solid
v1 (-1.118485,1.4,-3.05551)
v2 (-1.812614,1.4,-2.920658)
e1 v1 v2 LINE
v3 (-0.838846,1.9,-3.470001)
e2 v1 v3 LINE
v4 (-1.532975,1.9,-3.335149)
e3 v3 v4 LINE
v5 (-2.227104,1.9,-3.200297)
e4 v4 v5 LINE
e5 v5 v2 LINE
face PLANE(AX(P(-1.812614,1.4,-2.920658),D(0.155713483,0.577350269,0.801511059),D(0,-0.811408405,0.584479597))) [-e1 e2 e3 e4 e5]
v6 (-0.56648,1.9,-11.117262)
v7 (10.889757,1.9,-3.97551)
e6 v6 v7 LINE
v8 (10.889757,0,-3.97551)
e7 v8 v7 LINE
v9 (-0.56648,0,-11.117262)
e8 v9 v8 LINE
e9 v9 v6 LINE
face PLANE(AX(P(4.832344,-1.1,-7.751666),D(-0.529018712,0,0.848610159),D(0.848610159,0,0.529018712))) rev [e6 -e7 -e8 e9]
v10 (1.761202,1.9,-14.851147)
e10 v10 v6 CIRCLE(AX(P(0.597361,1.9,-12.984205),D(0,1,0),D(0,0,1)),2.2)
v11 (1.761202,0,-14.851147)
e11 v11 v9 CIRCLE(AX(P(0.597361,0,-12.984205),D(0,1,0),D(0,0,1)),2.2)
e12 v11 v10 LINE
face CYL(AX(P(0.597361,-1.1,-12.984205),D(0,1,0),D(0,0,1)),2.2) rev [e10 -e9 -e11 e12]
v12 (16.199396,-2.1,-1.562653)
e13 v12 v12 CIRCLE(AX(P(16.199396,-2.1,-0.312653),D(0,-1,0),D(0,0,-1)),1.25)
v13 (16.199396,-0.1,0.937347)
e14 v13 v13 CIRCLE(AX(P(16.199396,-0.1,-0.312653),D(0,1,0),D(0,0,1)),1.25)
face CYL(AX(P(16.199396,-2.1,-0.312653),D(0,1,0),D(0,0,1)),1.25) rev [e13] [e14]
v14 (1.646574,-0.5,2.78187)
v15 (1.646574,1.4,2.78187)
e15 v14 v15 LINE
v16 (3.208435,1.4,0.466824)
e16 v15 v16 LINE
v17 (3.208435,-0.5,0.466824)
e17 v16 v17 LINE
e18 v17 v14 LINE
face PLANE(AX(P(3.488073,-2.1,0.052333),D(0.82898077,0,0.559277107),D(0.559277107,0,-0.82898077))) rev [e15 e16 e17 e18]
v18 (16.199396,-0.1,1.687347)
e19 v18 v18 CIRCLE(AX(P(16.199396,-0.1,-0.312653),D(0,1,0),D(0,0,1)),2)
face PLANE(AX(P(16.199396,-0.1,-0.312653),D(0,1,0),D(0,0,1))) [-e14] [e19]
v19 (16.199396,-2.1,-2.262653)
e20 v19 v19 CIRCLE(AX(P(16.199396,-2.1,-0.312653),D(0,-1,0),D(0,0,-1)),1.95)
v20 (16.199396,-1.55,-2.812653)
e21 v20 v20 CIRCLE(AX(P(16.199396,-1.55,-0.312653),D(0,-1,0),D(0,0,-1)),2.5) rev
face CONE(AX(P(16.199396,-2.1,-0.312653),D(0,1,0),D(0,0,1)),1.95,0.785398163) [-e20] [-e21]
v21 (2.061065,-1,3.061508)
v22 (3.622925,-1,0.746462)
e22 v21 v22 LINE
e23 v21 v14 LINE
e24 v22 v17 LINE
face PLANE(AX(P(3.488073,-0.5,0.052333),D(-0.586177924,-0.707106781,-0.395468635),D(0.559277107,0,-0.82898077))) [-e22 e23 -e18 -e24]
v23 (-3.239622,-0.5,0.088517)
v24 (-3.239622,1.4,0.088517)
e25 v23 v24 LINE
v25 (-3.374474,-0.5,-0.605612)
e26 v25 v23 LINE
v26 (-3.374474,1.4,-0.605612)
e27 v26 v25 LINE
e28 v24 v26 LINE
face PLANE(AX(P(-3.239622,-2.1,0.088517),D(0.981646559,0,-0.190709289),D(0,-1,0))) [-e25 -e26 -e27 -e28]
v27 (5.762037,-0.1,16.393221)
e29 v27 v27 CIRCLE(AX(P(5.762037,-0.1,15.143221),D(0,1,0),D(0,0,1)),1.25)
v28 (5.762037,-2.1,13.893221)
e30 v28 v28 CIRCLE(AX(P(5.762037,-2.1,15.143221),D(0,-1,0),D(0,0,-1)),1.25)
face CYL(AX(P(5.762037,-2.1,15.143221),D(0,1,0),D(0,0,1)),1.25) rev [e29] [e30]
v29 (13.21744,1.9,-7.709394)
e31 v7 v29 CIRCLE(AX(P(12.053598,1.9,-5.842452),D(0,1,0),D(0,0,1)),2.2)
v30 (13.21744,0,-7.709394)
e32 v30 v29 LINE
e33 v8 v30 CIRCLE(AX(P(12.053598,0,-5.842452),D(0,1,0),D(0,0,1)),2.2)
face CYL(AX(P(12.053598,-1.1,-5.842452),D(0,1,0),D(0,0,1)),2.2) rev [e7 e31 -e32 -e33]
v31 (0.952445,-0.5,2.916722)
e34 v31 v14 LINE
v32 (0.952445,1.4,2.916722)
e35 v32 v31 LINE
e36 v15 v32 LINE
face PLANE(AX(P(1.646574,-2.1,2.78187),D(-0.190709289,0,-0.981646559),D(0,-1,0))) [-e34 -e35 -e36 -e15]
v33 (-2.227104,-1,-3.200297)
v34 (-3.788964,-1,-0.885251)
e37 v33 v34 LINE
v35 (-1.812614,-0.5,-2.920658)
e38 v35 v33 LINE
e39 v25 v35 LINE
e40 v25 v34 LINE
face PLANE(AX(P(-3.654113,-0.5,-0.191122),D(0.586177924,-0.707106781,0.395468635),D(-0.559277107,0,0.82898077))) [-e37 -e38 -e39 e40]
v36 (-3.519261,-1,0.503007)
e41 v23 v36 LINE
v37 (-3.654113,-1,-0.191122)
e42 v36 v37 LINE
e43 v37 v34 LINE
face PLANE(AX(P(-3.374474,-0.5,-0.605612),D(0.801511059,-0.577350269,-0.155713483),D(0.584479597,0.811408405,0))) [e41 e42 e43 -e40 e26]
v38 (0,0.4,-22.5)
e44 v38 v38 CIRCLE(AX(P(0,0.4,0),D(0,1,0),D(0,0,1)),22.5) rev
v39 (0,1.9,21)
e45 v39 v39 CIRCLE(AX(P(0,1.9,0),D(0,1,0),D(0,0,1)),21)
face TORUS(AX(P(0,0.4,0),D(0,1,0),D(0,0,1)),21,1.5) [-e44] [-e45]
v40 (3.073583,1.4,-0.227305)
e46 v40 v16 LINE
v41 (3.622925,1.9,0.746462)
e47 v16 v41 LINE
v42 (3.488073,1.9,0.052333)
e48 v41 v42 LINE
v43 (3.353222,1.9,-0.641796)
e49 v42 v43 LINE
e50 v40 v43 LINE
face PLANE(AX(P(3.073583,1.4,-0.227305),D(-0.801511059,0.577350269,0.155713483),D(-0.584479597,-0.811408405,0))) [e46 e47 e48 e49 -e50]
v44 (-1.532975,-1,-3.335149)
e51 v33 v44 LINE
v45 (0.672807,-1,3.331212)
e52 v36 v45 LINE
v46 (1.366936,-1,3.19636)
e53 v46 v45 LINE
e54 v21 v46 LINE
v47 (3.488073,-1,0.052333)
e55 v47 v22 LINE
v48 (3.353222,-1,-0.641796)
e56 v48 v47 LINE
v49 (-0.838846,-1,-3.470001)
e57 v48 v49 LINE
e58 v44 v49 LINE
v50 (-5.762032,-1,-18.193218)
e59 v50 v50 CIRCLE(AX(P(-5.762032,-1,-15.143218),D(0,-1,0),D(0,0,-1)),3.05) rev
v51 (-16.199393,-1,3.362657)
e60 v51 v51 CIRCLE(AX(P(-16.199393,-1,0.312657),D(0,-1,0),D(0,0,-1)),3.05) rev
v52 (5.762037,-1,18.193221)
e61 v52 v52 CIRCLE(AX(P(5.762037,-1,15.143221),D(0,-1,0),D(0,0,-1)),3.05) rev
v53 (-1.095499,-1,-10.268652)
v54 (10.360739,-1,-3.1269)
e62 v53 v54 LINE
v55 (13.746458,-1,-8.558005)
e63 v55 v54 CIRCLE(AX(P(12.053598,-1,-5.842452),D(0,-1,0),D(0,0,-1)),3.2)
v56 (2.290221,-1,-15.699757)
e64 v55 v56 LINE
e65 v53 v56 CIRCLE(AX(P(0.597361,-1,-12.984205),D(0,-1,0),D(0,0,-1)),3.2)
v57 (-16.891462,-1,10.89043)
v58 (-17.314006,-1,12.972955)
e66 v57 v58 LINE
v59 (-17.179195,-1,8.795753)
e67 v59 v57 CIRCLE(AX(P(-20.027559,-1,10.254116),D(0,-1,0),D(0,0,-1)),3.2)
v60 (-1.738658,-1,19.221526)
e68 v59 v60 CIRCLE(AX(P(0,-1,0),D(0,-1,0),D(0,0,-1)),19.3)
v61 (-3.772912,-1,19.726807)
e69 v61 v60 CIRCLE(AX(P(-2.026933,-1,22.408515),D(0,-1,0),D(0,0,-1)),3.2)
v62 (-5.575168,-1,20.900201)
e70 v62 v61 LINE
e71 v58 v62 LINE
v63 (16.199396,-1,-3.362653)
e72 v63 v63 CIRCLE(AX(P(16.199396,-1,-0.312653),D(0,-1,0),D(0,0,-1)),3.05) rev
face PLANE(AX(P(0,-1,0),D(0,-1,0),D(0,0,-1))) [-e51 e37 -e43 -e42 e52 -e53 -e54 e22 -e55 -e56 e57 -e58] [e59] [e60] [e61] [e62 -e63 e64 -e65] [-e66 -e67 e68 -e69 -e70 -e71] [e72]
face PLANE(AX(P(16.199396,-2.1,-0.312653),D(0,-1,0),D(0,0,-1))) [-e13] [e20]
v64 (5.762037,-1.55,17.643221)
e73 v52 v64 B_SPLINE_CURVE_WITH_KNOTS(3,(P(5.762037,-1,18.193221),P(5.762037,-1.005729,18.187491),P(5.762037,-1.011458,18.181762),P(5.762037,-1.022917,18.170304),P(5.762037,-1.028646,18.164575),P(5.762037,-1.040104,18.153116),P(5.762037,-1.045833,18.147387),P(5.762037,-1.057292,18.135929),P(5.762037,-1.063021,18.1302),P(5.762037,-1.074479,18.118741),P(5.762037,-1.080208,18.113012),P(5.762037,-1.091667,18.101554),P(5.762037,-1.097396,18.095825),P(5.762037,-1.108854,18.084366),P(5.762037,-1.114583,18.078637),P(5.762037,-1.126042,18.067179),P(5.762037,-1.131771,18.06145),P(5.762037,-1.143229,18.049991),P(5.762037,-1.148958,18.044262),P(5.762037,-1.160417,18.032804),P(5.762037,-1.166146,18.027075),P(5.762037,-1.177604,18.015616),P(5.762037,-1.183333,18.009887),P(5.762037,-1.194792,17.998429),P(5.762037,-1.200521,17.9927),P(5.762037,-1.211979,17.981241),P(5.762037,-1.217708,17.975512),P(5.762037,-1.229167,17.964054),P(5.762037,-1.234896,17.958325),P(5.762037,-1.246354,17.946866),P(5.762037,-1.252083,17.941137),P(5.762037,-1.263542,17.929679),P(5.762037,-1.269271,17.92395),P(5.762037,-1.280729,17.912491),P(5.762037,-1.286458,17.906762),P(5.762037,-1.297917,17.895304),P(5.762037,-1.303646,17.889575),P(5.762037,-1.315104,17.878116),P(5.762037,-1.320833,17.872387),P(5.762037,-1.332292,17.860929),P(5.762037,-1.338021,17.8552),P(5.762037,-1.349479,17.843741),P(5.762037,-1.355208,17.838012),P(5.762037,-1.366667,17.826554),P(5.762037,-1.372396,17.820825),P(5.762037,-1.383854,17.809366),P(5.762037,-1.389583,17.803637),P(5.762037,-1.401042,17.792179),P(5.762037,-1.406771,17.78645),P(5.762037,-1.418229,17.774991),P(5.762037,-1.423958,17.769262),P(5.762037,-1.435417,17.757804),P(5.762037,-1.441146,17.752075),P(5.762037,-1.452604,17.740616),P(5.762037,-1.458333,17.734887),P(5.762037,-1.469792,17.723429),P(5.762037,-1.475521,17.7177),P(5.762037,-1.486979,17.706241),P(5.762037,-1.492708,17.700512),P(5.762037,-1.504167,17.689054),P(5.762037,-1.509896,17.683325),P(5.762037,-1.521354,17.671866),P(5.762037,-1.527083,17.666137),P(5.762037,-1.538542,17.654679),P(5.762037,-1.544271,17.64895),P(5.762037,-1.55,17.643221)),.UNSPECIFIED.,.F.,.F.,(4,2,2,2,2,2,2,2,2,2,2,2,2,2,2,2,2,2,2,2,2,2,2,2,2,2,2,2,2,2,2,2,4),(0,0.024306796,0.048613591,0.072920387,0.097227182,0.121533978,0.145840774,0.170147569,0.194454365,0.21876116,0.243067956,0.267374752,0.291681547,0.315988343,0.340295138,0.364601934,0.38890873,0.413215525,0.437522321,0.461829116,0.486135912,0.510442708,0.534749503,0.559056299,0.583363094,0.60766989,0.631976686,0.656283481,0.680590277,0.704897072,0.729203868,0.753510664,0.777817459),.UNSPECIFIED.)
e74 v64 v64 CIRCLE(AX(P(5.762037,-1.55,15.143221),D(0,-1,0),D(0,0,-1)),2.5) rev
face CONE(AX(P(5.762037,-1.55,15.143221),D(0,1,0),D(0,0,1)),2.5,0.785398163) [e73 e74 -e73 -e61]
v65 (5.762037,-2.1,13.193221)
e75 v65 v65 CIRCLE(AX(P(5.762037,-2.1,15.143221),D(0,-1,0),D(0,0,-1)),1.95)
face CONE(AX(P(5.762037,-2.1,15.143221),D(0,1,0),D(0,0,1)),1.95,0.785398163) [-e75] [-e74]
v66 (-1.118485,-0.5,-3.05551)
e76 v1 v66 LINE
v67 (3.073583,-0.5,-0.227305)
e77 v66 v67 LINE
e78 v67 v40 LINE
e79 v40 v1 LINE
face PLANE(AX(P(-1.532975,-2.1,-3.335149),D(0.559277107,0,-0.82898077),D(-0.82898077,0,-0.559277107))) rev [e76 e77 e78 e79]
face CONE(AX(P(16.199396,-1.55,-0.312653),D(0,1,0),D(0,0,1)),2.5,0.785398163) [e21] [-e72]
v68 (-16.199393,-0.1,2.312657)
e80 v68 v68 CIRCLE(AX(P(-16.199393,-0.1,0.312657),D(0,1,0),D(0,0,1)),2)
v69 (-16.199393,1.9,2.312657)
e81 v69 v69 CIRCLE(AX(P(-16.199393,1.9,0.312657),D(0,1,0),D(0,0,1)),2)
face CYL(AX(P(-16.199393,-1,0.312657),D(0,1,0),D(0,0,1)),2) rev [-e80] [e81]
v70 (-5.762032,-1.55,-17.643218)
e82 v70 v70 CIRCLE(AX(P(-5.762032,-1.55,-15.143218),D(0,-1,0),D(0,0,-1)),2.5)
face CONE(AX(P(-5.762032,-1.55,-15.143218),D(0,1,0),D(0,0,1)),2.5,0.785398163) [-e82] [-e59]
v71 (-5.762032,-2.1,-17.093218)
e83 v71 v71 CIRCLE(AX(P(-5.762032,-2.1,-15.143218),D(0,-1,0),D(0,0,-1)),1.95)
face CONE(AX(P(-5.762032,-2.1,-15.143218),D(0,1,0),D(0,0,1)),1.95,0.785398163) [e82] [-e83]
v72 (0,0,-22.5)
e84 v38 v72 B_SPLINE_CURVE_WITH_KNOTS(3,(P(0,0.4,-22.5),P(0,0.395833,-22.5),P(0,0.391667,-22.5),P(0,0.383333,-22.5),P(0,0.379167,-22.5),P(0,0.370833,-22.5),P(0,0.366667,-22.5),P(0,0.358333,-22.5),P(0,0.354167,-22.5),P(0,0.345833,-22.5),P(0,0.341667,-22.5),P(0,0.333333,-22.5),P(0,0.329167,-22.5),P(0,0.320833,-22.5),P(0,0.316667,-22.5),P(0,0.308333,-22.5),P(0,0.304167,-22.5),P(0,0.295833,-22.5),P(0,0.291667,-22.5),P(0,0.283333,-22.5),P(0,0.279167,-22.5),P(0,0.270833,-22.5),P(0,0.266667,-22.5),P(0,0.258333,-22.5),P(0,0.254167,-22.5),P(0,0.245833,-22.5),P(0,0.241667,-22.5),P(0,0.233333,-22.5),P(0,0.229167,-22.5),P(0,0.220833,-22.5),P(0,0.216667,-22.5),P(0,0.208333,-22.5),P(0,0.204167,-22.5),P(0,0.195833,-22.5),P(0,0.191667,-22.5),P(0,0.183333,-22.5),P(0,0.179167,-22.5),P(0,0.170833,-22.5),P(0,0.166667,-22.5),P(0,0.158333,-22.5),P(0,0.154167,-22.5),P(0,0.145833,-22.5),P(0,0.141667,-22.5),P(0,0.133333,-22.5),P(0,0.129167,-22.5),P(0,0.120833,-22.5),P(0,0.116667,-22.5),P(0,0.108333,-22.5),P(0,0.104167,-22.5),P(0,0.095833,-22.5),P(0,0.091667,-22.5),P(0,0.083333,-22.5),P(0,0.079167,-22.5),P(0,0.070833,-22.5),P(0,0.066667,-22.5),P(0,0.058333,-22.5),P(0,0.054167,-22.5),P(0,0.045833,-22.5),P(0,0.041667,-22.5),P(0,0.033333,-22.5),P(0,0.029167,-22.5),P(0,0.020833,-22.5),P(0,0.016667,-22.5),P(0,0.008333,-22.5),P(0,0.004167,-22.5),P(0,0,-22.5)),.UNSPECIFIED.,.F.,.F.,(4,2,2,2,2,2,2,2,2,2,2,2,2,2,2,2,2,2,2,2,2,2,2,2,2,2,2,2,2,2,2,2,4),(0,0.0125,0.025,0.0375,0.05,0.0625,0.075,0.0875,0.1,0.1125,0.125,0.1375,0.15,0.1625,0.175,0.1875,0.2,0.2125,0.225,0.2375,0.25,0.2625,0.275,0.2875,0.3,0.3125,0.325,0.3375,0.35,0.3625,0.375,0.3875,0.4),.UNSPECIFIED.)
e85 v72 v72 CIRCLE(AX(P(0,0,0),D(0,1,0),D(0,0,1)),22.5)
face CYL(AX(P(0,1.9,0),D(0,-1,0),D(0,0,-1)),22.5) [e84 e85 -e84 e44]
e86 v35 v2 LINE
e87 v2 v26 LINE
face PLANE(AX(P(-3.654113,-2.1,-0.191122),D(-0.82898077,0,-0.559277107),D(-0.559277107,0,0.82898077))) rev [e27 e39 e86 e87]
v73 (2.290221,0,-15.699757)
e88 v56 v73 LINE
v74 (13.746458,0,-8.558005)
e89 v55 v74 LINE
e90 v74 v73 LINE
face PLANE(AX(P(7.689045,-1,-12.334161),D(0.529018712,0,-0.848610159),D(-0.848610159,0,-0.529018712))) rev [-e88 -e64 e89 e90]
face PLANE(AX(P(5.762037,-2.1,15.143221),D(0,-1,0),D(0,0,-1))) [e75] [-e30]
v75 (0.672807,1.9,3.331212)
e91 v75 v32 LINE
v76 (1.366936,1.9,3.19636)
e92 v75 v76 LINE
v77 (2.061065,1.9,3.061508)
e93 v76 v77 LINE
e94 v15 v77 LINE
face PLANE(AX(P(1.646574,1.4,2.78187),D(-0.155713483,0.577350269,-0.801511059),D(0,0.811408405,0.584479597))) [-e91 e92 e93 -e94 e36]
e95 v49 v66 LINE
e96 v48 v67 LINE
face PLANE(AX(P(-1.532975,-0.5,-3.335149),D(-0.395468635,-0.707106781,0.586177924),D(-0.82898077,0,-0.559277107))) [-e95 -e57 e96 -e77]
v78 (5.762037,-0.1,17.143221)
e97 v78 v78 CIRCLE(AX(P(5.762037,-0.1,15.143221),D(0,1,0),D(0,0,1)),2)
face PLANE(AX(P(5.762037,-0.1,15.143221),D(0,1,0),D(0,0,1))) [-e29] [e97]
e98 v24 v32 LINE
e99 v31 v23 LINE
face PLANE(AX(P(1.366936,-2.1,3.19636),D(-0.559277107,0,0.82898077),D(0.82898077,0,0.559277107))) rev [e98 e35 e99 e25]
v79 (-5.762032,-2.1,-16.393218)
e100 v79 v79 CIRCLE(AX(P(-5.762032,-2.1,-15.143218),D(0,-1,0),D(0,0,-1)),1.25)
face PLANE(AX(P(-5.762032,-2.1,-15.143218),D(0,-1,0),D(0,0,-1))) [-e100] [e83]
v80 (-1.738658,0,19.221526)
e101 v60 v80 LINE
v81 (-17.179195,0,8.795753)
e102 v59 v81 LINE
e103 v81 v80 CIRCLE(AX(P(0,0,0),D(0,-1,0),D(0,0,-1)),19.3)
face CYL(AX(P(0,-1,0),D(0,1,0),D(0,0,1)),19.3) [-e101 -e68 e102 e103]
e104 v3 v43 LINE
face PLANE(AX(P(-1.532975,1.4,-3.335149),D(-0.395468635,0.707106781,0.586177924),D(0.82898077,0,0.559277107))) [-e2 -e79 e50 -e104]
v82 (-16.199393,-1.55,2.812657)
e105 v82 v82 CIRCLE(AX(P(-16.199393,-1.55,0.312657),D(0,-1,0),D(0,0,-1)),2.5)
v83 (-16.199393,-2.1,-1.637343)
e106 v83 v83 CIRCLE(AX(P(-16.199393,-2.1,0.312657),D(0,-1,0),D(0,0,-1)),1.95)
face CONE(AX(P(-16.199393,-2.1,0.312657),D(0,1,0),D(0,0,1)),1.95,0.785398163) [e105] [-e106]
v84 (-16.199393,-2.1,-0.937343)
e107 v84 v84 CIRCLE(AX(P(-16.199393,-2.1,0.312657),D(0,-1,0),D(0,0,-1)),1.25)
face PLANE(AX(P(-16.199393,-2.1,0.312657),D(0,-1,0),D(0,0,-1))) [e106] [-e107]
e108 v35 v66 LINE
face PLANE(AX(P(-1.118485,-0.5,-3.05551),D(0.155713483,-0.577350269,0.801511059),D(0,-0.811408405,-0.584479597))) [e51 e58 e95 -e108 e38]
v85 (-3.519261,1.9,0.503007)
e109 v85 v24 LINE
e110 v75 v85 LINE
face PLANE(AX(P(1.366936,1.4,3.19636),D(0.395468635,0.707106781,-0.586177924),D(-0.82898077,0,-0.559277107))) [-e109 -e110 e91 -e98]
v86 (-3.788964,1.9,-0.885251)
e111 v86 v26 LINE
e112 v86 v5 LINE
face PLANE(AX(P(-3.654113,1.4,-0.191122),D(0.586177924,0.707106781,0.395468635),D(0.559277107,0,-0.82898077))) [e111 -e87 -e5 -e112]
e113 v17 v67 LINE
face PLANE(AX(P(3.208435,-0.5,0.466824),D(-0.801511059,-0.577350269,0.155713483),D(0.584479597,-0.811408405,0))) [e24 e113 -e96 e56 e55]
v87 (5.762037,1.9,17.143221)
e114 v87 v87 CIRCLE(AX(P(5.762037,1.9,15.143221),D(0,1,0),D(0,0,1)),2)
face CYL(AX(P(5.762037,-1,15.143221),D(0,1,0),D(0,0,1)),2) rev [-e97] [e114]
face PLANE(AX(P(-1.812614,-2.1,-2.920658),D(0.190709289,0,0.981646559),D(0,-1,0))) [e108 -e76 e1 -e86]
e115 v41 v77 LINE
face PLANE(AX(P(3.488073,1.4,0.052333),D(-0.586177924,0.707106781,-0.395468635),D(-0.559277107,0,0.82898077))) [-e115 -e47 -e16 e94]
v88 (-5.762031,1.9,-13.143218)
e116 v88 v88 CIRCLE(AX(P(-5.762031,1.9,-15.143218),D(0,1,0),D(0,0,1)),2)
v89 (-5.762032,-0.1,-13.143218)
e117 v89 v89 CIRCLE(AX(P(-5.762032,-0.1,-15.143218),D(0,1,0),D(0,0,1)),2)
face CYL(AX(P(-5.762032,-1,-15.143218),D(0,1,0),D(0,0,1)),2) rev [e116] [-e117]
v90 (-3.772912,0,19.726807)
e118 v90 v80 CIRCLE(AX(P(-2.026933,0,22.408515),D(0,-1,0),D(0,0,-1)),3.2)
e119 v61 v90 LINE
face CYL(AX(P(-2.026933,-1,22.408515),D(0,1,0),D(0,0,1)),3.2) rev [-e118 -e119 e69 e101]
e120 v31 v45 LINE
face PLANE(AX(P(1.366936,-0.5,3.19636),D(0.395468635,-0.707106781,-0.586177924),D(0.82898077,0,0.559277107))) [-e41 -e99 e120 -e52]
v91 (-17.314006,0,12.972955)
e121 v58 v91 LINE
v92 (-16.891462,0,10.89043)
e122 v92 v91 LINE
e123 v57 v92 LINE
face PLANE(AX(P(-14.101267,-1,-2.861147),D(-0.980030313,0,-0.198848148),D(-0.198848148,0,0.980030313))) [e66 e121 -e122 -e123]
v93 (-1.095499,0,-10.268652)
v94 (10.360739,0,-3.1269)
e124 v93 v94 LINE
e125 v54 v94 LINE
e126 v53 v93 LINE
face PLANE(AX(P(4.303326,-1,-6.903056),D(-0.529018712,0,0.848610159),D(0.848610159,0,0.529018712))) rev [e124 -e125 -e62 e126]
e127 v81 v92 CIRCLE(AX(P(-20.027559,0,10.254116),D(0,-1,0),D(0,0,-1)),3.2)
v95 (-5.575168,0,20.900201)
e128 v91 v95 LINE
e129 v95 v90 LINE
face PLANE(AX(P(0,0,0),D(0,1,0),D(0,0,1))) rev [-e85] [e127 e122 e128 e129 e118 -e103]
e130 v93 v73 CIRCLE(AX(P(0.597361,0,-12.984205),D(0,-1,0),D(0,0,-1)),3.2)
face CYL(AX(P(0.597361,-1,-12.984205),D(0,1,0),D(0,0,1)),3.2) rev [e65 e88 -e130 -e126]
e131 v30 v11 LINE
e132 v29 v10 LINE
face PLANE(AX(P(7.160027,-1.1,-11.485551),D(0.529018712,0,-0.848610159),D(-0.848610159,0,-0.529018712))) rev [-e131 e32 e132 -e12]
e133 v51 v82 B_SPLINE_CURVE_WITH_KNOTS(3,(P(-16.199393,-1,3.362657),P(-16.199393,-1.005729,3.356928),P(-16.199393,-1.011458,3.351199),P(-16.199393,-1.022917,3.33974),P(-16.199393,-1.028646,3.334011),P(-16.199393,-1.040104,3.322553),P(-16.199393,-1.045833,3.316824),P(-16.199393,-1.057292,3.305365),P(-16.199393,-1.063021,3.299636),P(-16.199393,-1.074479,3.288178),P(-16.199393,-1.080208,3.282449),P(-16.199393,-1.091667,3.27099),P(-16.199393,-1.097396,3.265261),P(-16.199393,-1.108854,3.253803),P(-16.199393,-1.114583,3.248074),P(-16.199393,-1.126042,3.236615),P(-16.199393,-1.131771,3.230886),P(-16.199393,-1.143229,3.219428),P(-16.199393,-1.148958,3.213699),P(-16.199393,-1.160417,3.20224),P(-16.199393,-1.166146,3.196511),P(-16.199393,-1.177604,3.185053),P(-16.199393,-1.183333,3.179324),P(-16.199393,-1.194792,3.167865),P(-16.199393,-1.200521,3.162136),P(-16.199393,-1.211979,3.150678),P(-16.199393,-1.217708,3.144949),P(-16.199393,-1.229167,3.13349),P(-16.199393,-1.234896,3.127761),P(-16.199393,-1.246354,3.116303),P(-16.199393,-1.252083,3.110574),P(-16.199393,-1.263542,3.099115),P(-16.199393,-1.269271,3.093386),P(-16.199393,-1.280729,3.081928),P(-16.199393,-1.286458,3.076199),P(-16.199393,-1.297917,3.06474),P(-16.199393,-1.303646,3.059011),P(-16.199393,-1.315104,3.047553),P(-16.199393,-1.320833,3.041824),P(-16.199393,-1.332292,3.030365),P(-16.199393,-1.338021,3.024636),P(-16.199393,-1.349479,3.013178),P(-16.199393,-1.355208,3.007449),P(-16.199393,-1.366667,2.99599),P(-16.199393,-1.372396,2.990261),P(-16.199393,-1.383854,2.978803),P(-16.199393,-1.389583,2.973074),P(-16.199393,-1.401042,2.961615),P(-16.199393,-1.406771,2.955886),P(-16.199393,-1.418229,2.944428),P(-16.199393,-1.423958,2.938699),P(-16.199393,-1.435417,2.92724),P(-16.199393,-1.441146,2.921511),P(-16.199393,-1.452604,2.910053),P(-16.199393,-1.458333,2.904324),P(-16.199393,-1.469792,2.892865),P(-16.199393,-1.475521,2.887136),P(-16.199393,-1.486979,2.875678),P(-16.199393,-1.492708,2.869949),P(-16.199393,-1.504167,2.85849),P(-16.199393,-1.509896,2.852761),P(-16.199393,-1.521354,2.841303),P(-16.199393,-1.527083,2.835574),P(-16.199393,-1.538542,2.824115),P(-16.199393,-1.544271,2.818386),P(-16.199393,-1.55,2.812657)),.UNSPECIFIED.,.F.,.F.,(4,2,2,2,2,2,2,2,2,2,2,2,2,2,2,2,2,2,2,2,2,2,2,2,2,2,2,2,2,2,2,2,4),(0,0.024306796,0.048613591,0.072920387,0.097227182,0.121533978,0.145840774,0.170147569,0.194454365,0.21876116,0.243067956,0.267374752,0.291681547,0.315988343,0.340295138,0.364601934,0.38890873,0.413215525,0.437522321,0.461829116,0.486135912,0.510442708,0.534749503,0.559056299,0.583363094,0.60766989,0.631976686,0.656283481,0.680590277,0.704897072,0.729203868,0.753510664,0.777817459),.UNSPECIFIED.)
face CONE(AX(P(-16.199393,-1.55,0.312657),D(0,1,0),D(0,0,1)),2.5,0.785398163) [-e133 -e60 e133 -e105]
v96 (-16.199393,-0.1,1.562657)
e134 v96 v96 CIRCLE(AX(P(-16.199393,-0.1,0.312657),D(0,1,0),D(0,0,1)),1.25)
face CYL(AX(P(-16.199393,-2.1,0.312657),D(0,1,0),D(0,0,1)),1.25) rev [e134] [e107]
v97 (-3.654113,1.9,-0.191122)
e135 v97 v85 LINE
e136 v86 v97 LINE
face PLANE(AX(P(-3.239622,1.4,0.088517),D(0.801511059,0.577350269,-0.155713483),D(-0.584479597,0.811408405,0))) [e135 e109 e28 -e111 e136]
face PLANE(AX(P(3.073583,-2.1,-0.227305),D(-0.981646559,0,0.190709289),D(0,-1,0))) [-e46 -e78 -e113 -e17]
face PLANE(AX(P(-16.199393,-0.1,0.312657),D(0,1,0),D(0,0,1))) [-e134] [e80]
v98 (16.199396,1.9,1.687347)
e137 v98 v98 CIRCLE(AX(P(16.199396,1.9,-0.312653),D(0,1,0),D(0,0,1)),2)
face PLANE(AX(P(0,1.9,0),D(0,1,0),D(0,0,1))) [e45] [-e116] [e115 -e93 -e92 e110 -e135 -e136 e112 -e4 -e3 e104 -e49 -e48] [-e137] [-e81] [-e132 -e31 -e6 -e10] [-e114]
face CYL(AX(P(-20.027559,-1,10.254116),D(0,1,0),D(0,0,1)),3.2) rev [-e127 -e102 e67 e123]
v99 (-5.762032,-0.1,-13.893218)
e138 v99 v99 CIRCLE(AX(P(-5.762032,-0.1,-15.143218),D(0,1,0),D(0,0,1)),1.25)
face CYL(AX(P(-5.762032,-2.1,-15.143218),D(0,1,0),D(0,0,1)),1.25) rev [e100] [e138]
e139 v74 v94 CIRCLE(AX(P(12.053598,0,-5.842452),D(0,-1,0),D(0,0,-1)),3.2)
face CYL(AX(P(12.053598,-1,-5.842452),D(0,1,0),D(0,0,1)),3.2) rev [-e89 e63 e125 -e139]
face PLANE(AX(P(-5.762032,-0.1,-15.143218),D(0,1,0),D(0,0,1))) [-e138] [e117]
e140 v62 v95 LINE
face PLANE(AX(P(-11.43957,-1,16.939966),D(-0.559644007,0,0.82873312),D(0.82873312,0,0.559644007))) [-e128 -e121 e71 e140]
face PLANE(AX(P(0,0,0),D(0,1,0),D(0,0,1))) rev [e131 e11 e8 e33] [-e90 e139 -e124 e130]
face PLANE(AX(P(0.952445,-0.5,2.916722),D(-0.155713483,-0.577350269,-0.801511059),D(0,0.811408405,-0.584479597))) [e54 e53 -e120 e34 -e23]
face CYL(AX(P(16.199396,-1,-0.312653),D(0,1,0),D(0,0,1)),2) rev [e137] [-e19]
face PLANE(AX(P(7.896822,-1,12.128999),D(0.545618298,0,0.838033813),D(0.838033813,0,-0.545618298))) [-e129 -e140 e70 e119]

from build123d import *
from build123d.topology import SkipClean

# Parameters (mm, degrees)
SKETCH1_R           = 22.5
BOSS_EXTRUDE1_DEPTH = 1.9
SKETCH2_R           = 1.25
CUT_EXTRUDE1_DEPTH  = 32.876480358
CUT_EXTRUDE2_DEPTH  = 3
SKETCH5_R           = 2
BOSS_EXTRUDE2_DEPTH = 1
SKETCH6_R           = 2
CUT_EXTRUDE3_DEPTH  = 2
FILLET2_R           = 1.5
SKETCH7_R           = 2.5
SKETCH7_R_2         = 1.25
BOSS_EXTRUDE3_DEPTH = 1.1
CHAMFER2_SIZE       = 0.55
BOSS_EXTRUDE4_START = 0.9
SKETCH10_R          = 2
SKETCH10_R_2        = 1.25
BOSS_EXTRUDE4_DEPTH = 0.9
CUT_EXTRUDE4_DEPTH  = 33.070235422
CHAMFER3_SIZE       = 0.5


with BuildPart() as part:
    # Sketch1 → Boss-Extrude1 (new body)
    with BuildSketch(Plane(origin=(0, 0, 0), x_dir=(1, 0, 0), z_dir=(0, 1, 0))):
        with Locations(Location((0, 0, 0), (0, 0, 90))):
            Circle(SKETCH1_R)
    extrude(amount=BOSS_EXTRUDE1_DEPTH)

    # Sketch2 → Cut-Extrude1 (cut, through all)
    with BuildSketch(Plane.XZ):
        with Locations(Location((16.199395554, -0.312653275, 0), (0, 0, 270))):
            Circle(SKETCH2_R)
        with Locations(Location((-5.762032101, -15.143217553, 0), (0, 0, 270))):
            Circle(SKETCH2_R)
        with Locations(Location((-16.199392803, 0.312657063, 0), (0, 0, 270))):
            Circle(SKETCH2_R)
        with Locations(Location((5.762036646, 15.143220658, 0), (0, 0, 270))):
            Circle(SKETCH2_R)
    extrude(amount=-CUT_EXTRUDE1_DEPTH, mode=Mode.SUBTRACT)

    # Sketch3 → Cut-Extrude2 (cut)
    with BuildSketch(Plane(origin=(0, 1.9, 0), x_dir=(1, 0, 0), z_dir=(0, 1, 0))):
        with BuildLine():
            Line((-0.566479918, 11.117262385), (10.889757234, 3.975509775))
            ThreePointArc((10.889757234, 3.975509775), (13.92054075, 4.67861096), (13.217439566, 7.709394476))
            Line((13.217439566, 7.709394476), (1.761202414, 14.851147086))
            ThreePointArc((1.761202414, 14.851147086), (-1.269581102, 14.148045901), (-0.566479918, 11.117262385))
        make_face()
    extrude(amount=-CUT_EXTRUDE2_DEPTH, mode=Mode.SUBTRACT)

    # Sketch5 → Boss-Extrude2 (add)
    with BuildSketch(Plane.XZ):
        with BuildLine():
            ThreePointArc((-17.179194793, 8.795752741), (-16.857328224, 9.81864057), (-16.891461695, 10.890429965))
            Line((-16.891461695, 10.890429965), (-17.314006113, 12.972955453))
            Line((-17.314006113, 12.972955453), (-5.575167705, 20.900200554))
            Line((-5.575167705, 20.900200554), (-3.772911963, 19.726806718))
            ThreePointArc((-3.772911963, 19.726806718), (-2.798329578, 19.30288327), (-1.738658435, 19.221526132))
            ThreePointArc((-1.738658435, 19.221526132), (10.800253719, -15.9951405), (-17.179194793, 8.795752741))
        make_face()
        with Locations(Location((-5.762032101, -15.143217553, 0), (0, 0, 270))):
            Circle(SKETCH5_R, mode=Mode.SUBTRACT)
        with Locations(Location((16.199395554, -0.312653275, 0), (0, 0, 270))):
            Circle(SKETCH5_R, mode=Mode.SUBTRACT)
        with Locations(Location((5.762036647, 15.143220658, 0), (0, 0, 270))):
            Circle(SKETCH5_R, mode=Mode.SUBTRACT)
        with Locations(Location((-16.199392803, 0.312657063, 0), (0, 0, 270))):
            Circle(SKETCH5_R, mode=Mode.SUBTRACT)
        with BuildLine():
            ThreePointArc((-1.095498629, -10.268652225), (-2.118191262, -14.677064613), (2.290221126, -15.699757245))
            Line((2.290221126, -15.699757245), (13.746458277, -8.558004636))
            ThreePointArc((13.746458277, -8.558004636), (14.76915091, -4.149592248), (10.360738522, -3.126899616))
            Line((10.360738522, -3.126899616), (-1.095498629, -10.268652225))
        make_face(mode=Mode.SUBTRACT)
    extrude(amount=BOSS_EXTRUDE2_DEPTH)

    # Sketch6 → Cut-Extrude3 (cut)
    with SkipClean():  # the faces are left unmerged after this step: merging them gives an invalid solid
        with BuildSketch(Plane(origin=(0, 1.9, 0), x_dir=(1, 0, 0), z_dir=(0, 1, 0))):
            with Locations(Location((-16.199392803, -0.312657063, 0), (0, 0, 270))):
                Circle(SKETCH6_R)
            with Locations(Location((-5.762030762, 15.143217579, 0), (0, 0, 270))):
                Circle(SKETCH6_R)
            with Locations(Location((5.762036646, -15.143220658, 0), (0, 0, 270.000000006))):
                Circle(SKETCH6_R)
            with Locations(Location((16.199395554, 0.312653275, 0), (0, 0, 270))):
                Circle(SKETCH6_R)
        extrude(amount=-CUT_EXTRUDE3_DEPTH, mode=Mode.SUBTRACT)
    add(part.part.scale(1), mode=Mode.REPLACE)  # the faces are merged on a copy

    # Fillet2
    fillet2_edges = [part.edges().sort_by_distance(p)[0] for p in [
        (0, 1.9, 22.5),
    ]]
    fillet(fillet2_edges, radius=FILLET2_R)

    # Sketch7 → Boss-Extrude3 (add)
    # profile 1 of 4: a face of its own
    with BuildSketch(Plane.XZ.offset(1)):
        with Locations(Location((-16.199392803, 0.312657063, 0), (0, 0, 270))):
            Circle(SKETCH7_R)
        with Locations(Location((-16.199392803, 0.312657063, 0), (0, 0, 270))):
            Circle(SKETCH7_R_2, mode=Mode.SUBTRACT)
    # profile 2 of 4: a face of its own
    with BuildSketch(Plane.XZ.offset(1)):
        with Locations(Location((5.762036647, 15.143220658, 0), (0, 0, 270))):
            Circle(SKETCH7_R)
        with Locations(Location((5.762036647, 15.143220658, 0), (0, 0, 270))):
            Circle(SKETCH7_R_2, mode=Mode.SUBTRACT)
    # profile 3 of 4: a face of its own
    with BuildSketch(Plane.XZ.offset(1)):
        with Locations(Location((16.199395554, -0.312653275, 0), (0, 0, 270))):
            Circle(SKETCH7_R)
        with Locations(Location((16.199395554, -0.312653275, 0), (0, 0, 270))):
            Circle(SKETCH7_R_2, mode=Mode.SUBTRACT)
    # profile 4 of 4: a face of its own
    with BuildSketch(Plane.XZ.offset(1)):
        with Locations(Location((-5.762032101, -15.143217553, 0), (0, 0, 270))):
            Circle(SKETCH7_R)
        with Locations(Location((-5.762032101, -15.143217553, 0), (0, 0, 270))):
            Circle(SKETCH7_R_2, mode=Mode.SUBTRACT)
    extrude(amount=BOSS_EXTRUDE3_DEPTH)

    # Chamfer2
    chamfer2_edges = [part.edges().sort_by_distance(p)[0] for p in [
        (-16.199392803, -2.1, 2.812657063),
        (-16.199392803, -1, 2.812657063),
        (5.762036647, -2.1, 17.643220658),
        (5.762036647, -1, 17.643220658),
        (16.199395554, -2.1, 2.187346725),
        (16.199395554, -1, 2.187346725),
        (-5.762032101, -2.1, -12.643217553),
        (-5.762032101, -1, -12.643217553),
    ]]
    chamfer(chamfer2_edges, length=CHAMFER2_SIZE - 0.0001)  # a hair under: the kernel refuses the full size

    # Sketch10 → Boss-Extrude4 (add)
    # profile 1 of 4: a face of its own
    with BuildSketch(Plane(origin=(0, -1, 0), x_dir=(1, 0, 0), z_dir=(0, 1, 0)).offset(BOSS_EXTRUDE4_START)):
        with Locations(Location((-5.762032101, 15.143217553, 0), (0, 0, 270))):
            Circle(SKETCH10_R)
        with Locations(Location((-5.762032101, 15.143217553, 0), (0, 0, 270))):
            Circle(SKETCH10_R_2, mode=Mode.SUBTRACT)
    # profile 2 of 4: a face of its own
    with BuildSketch(Plane(origin=(0, -1, 0), x_dir=(1, 0, 0), z_dir=(0, 1, 0)).offset(BOSS_EXTRUDE4_START)):
        with Locations(Location((5.762036647, -15.143220658, 0), (0, 0, 270))):
            Circle(SKETCH10_R)
        with Locations(Location((5.762036647, -15.143220658, 0), (0, 0, 270))):
            Circle(SKETCH10_R_2, mode=Mode.SUBTRACT)
    # profile 3 of 4: a face of its own
    with BuildSketch(Plane(origin=(0, -1, 0), x_dir=(1, 0, 0), z_dir=(0, 1, 0)).offset(BOSS_EXTRUDE4_START)):
        with Locations(Location((16.199395554, 0.312653275, 0), (0, 0, 270))):
            Circle(SKETCH10_R)
        with Locations(Location((16.199395554, 0.312653275, 0), (0, 0, 270))):
            Circle(SKETCH10_R_2, mode=Mode.SUBTRACT)
    # profile 4 of 4: a face of its own
    with BuildSketch(Plane(origin=(0, -1, 0), x_dir=(1, 0, 0), z_dir=(0, 1, 0)).offset(BOSS_EXTRUDE4_START)):
        with Locations(Location((-16.199392803, -0.312657063, 0), (0, 0, 270))):
            Circle(SKETCH10_R)
        with Locations(Location((-16.199392803, -0.312657063, 0), (0, 0, 270))):
            Circle(SKETCH10_R_2, mode=Mode.SUBTRACT)
    extrude(amount=-BOSS_EXTRUDE4_DEPTH)

    # Sketch11 → Cut-Extrude4 (cut, through all)
    with BuildSketch(Plane(origin=(0, 1.9, 0), x_dir=(1, 0, 0), z_dir=(0, 1, 0))):
        Polygon((1.366935798, -3.196360259), (-3.654112636, 0.191121747), (-1.532974971, 3.335148765), (3.488073463, -0.052333241), align=None)
    extrude(amount=-CUT_EXTRUDE4_DEPTH, mode=Mode.SUBTRACT)

    # Chamfer3
    chamfer3_edges = [part.edges().sort_by_distance(p)[0] for p in [
        (0.977549246, -1, -1.641407762),
        (-2.593543803, -1, -1.763135256),
        (-1.143588419, -1, 1.502619256),
        (2.42750463, -1, 1.62434675),
        (3.488073463, 0.45, 0.052333241),
        (1.366935798, 0.45, 3.196360259),
        (-3.654112636, 0.45, -0.191121747),
        (-1.532974971, 0.45, -3.335148765),
        (2.42750463, 1.9, 1.62434675),
        (0.977549246, 1.9, -1.641407762),
        (-2.593543803, 1.9, -1.763135256),
        (-1.143588419, 1.9, 1.502619256),
    ]]
    chamfer(chamfer3_edges, length=CHAMFER3_SIZE)


solid = part.part
